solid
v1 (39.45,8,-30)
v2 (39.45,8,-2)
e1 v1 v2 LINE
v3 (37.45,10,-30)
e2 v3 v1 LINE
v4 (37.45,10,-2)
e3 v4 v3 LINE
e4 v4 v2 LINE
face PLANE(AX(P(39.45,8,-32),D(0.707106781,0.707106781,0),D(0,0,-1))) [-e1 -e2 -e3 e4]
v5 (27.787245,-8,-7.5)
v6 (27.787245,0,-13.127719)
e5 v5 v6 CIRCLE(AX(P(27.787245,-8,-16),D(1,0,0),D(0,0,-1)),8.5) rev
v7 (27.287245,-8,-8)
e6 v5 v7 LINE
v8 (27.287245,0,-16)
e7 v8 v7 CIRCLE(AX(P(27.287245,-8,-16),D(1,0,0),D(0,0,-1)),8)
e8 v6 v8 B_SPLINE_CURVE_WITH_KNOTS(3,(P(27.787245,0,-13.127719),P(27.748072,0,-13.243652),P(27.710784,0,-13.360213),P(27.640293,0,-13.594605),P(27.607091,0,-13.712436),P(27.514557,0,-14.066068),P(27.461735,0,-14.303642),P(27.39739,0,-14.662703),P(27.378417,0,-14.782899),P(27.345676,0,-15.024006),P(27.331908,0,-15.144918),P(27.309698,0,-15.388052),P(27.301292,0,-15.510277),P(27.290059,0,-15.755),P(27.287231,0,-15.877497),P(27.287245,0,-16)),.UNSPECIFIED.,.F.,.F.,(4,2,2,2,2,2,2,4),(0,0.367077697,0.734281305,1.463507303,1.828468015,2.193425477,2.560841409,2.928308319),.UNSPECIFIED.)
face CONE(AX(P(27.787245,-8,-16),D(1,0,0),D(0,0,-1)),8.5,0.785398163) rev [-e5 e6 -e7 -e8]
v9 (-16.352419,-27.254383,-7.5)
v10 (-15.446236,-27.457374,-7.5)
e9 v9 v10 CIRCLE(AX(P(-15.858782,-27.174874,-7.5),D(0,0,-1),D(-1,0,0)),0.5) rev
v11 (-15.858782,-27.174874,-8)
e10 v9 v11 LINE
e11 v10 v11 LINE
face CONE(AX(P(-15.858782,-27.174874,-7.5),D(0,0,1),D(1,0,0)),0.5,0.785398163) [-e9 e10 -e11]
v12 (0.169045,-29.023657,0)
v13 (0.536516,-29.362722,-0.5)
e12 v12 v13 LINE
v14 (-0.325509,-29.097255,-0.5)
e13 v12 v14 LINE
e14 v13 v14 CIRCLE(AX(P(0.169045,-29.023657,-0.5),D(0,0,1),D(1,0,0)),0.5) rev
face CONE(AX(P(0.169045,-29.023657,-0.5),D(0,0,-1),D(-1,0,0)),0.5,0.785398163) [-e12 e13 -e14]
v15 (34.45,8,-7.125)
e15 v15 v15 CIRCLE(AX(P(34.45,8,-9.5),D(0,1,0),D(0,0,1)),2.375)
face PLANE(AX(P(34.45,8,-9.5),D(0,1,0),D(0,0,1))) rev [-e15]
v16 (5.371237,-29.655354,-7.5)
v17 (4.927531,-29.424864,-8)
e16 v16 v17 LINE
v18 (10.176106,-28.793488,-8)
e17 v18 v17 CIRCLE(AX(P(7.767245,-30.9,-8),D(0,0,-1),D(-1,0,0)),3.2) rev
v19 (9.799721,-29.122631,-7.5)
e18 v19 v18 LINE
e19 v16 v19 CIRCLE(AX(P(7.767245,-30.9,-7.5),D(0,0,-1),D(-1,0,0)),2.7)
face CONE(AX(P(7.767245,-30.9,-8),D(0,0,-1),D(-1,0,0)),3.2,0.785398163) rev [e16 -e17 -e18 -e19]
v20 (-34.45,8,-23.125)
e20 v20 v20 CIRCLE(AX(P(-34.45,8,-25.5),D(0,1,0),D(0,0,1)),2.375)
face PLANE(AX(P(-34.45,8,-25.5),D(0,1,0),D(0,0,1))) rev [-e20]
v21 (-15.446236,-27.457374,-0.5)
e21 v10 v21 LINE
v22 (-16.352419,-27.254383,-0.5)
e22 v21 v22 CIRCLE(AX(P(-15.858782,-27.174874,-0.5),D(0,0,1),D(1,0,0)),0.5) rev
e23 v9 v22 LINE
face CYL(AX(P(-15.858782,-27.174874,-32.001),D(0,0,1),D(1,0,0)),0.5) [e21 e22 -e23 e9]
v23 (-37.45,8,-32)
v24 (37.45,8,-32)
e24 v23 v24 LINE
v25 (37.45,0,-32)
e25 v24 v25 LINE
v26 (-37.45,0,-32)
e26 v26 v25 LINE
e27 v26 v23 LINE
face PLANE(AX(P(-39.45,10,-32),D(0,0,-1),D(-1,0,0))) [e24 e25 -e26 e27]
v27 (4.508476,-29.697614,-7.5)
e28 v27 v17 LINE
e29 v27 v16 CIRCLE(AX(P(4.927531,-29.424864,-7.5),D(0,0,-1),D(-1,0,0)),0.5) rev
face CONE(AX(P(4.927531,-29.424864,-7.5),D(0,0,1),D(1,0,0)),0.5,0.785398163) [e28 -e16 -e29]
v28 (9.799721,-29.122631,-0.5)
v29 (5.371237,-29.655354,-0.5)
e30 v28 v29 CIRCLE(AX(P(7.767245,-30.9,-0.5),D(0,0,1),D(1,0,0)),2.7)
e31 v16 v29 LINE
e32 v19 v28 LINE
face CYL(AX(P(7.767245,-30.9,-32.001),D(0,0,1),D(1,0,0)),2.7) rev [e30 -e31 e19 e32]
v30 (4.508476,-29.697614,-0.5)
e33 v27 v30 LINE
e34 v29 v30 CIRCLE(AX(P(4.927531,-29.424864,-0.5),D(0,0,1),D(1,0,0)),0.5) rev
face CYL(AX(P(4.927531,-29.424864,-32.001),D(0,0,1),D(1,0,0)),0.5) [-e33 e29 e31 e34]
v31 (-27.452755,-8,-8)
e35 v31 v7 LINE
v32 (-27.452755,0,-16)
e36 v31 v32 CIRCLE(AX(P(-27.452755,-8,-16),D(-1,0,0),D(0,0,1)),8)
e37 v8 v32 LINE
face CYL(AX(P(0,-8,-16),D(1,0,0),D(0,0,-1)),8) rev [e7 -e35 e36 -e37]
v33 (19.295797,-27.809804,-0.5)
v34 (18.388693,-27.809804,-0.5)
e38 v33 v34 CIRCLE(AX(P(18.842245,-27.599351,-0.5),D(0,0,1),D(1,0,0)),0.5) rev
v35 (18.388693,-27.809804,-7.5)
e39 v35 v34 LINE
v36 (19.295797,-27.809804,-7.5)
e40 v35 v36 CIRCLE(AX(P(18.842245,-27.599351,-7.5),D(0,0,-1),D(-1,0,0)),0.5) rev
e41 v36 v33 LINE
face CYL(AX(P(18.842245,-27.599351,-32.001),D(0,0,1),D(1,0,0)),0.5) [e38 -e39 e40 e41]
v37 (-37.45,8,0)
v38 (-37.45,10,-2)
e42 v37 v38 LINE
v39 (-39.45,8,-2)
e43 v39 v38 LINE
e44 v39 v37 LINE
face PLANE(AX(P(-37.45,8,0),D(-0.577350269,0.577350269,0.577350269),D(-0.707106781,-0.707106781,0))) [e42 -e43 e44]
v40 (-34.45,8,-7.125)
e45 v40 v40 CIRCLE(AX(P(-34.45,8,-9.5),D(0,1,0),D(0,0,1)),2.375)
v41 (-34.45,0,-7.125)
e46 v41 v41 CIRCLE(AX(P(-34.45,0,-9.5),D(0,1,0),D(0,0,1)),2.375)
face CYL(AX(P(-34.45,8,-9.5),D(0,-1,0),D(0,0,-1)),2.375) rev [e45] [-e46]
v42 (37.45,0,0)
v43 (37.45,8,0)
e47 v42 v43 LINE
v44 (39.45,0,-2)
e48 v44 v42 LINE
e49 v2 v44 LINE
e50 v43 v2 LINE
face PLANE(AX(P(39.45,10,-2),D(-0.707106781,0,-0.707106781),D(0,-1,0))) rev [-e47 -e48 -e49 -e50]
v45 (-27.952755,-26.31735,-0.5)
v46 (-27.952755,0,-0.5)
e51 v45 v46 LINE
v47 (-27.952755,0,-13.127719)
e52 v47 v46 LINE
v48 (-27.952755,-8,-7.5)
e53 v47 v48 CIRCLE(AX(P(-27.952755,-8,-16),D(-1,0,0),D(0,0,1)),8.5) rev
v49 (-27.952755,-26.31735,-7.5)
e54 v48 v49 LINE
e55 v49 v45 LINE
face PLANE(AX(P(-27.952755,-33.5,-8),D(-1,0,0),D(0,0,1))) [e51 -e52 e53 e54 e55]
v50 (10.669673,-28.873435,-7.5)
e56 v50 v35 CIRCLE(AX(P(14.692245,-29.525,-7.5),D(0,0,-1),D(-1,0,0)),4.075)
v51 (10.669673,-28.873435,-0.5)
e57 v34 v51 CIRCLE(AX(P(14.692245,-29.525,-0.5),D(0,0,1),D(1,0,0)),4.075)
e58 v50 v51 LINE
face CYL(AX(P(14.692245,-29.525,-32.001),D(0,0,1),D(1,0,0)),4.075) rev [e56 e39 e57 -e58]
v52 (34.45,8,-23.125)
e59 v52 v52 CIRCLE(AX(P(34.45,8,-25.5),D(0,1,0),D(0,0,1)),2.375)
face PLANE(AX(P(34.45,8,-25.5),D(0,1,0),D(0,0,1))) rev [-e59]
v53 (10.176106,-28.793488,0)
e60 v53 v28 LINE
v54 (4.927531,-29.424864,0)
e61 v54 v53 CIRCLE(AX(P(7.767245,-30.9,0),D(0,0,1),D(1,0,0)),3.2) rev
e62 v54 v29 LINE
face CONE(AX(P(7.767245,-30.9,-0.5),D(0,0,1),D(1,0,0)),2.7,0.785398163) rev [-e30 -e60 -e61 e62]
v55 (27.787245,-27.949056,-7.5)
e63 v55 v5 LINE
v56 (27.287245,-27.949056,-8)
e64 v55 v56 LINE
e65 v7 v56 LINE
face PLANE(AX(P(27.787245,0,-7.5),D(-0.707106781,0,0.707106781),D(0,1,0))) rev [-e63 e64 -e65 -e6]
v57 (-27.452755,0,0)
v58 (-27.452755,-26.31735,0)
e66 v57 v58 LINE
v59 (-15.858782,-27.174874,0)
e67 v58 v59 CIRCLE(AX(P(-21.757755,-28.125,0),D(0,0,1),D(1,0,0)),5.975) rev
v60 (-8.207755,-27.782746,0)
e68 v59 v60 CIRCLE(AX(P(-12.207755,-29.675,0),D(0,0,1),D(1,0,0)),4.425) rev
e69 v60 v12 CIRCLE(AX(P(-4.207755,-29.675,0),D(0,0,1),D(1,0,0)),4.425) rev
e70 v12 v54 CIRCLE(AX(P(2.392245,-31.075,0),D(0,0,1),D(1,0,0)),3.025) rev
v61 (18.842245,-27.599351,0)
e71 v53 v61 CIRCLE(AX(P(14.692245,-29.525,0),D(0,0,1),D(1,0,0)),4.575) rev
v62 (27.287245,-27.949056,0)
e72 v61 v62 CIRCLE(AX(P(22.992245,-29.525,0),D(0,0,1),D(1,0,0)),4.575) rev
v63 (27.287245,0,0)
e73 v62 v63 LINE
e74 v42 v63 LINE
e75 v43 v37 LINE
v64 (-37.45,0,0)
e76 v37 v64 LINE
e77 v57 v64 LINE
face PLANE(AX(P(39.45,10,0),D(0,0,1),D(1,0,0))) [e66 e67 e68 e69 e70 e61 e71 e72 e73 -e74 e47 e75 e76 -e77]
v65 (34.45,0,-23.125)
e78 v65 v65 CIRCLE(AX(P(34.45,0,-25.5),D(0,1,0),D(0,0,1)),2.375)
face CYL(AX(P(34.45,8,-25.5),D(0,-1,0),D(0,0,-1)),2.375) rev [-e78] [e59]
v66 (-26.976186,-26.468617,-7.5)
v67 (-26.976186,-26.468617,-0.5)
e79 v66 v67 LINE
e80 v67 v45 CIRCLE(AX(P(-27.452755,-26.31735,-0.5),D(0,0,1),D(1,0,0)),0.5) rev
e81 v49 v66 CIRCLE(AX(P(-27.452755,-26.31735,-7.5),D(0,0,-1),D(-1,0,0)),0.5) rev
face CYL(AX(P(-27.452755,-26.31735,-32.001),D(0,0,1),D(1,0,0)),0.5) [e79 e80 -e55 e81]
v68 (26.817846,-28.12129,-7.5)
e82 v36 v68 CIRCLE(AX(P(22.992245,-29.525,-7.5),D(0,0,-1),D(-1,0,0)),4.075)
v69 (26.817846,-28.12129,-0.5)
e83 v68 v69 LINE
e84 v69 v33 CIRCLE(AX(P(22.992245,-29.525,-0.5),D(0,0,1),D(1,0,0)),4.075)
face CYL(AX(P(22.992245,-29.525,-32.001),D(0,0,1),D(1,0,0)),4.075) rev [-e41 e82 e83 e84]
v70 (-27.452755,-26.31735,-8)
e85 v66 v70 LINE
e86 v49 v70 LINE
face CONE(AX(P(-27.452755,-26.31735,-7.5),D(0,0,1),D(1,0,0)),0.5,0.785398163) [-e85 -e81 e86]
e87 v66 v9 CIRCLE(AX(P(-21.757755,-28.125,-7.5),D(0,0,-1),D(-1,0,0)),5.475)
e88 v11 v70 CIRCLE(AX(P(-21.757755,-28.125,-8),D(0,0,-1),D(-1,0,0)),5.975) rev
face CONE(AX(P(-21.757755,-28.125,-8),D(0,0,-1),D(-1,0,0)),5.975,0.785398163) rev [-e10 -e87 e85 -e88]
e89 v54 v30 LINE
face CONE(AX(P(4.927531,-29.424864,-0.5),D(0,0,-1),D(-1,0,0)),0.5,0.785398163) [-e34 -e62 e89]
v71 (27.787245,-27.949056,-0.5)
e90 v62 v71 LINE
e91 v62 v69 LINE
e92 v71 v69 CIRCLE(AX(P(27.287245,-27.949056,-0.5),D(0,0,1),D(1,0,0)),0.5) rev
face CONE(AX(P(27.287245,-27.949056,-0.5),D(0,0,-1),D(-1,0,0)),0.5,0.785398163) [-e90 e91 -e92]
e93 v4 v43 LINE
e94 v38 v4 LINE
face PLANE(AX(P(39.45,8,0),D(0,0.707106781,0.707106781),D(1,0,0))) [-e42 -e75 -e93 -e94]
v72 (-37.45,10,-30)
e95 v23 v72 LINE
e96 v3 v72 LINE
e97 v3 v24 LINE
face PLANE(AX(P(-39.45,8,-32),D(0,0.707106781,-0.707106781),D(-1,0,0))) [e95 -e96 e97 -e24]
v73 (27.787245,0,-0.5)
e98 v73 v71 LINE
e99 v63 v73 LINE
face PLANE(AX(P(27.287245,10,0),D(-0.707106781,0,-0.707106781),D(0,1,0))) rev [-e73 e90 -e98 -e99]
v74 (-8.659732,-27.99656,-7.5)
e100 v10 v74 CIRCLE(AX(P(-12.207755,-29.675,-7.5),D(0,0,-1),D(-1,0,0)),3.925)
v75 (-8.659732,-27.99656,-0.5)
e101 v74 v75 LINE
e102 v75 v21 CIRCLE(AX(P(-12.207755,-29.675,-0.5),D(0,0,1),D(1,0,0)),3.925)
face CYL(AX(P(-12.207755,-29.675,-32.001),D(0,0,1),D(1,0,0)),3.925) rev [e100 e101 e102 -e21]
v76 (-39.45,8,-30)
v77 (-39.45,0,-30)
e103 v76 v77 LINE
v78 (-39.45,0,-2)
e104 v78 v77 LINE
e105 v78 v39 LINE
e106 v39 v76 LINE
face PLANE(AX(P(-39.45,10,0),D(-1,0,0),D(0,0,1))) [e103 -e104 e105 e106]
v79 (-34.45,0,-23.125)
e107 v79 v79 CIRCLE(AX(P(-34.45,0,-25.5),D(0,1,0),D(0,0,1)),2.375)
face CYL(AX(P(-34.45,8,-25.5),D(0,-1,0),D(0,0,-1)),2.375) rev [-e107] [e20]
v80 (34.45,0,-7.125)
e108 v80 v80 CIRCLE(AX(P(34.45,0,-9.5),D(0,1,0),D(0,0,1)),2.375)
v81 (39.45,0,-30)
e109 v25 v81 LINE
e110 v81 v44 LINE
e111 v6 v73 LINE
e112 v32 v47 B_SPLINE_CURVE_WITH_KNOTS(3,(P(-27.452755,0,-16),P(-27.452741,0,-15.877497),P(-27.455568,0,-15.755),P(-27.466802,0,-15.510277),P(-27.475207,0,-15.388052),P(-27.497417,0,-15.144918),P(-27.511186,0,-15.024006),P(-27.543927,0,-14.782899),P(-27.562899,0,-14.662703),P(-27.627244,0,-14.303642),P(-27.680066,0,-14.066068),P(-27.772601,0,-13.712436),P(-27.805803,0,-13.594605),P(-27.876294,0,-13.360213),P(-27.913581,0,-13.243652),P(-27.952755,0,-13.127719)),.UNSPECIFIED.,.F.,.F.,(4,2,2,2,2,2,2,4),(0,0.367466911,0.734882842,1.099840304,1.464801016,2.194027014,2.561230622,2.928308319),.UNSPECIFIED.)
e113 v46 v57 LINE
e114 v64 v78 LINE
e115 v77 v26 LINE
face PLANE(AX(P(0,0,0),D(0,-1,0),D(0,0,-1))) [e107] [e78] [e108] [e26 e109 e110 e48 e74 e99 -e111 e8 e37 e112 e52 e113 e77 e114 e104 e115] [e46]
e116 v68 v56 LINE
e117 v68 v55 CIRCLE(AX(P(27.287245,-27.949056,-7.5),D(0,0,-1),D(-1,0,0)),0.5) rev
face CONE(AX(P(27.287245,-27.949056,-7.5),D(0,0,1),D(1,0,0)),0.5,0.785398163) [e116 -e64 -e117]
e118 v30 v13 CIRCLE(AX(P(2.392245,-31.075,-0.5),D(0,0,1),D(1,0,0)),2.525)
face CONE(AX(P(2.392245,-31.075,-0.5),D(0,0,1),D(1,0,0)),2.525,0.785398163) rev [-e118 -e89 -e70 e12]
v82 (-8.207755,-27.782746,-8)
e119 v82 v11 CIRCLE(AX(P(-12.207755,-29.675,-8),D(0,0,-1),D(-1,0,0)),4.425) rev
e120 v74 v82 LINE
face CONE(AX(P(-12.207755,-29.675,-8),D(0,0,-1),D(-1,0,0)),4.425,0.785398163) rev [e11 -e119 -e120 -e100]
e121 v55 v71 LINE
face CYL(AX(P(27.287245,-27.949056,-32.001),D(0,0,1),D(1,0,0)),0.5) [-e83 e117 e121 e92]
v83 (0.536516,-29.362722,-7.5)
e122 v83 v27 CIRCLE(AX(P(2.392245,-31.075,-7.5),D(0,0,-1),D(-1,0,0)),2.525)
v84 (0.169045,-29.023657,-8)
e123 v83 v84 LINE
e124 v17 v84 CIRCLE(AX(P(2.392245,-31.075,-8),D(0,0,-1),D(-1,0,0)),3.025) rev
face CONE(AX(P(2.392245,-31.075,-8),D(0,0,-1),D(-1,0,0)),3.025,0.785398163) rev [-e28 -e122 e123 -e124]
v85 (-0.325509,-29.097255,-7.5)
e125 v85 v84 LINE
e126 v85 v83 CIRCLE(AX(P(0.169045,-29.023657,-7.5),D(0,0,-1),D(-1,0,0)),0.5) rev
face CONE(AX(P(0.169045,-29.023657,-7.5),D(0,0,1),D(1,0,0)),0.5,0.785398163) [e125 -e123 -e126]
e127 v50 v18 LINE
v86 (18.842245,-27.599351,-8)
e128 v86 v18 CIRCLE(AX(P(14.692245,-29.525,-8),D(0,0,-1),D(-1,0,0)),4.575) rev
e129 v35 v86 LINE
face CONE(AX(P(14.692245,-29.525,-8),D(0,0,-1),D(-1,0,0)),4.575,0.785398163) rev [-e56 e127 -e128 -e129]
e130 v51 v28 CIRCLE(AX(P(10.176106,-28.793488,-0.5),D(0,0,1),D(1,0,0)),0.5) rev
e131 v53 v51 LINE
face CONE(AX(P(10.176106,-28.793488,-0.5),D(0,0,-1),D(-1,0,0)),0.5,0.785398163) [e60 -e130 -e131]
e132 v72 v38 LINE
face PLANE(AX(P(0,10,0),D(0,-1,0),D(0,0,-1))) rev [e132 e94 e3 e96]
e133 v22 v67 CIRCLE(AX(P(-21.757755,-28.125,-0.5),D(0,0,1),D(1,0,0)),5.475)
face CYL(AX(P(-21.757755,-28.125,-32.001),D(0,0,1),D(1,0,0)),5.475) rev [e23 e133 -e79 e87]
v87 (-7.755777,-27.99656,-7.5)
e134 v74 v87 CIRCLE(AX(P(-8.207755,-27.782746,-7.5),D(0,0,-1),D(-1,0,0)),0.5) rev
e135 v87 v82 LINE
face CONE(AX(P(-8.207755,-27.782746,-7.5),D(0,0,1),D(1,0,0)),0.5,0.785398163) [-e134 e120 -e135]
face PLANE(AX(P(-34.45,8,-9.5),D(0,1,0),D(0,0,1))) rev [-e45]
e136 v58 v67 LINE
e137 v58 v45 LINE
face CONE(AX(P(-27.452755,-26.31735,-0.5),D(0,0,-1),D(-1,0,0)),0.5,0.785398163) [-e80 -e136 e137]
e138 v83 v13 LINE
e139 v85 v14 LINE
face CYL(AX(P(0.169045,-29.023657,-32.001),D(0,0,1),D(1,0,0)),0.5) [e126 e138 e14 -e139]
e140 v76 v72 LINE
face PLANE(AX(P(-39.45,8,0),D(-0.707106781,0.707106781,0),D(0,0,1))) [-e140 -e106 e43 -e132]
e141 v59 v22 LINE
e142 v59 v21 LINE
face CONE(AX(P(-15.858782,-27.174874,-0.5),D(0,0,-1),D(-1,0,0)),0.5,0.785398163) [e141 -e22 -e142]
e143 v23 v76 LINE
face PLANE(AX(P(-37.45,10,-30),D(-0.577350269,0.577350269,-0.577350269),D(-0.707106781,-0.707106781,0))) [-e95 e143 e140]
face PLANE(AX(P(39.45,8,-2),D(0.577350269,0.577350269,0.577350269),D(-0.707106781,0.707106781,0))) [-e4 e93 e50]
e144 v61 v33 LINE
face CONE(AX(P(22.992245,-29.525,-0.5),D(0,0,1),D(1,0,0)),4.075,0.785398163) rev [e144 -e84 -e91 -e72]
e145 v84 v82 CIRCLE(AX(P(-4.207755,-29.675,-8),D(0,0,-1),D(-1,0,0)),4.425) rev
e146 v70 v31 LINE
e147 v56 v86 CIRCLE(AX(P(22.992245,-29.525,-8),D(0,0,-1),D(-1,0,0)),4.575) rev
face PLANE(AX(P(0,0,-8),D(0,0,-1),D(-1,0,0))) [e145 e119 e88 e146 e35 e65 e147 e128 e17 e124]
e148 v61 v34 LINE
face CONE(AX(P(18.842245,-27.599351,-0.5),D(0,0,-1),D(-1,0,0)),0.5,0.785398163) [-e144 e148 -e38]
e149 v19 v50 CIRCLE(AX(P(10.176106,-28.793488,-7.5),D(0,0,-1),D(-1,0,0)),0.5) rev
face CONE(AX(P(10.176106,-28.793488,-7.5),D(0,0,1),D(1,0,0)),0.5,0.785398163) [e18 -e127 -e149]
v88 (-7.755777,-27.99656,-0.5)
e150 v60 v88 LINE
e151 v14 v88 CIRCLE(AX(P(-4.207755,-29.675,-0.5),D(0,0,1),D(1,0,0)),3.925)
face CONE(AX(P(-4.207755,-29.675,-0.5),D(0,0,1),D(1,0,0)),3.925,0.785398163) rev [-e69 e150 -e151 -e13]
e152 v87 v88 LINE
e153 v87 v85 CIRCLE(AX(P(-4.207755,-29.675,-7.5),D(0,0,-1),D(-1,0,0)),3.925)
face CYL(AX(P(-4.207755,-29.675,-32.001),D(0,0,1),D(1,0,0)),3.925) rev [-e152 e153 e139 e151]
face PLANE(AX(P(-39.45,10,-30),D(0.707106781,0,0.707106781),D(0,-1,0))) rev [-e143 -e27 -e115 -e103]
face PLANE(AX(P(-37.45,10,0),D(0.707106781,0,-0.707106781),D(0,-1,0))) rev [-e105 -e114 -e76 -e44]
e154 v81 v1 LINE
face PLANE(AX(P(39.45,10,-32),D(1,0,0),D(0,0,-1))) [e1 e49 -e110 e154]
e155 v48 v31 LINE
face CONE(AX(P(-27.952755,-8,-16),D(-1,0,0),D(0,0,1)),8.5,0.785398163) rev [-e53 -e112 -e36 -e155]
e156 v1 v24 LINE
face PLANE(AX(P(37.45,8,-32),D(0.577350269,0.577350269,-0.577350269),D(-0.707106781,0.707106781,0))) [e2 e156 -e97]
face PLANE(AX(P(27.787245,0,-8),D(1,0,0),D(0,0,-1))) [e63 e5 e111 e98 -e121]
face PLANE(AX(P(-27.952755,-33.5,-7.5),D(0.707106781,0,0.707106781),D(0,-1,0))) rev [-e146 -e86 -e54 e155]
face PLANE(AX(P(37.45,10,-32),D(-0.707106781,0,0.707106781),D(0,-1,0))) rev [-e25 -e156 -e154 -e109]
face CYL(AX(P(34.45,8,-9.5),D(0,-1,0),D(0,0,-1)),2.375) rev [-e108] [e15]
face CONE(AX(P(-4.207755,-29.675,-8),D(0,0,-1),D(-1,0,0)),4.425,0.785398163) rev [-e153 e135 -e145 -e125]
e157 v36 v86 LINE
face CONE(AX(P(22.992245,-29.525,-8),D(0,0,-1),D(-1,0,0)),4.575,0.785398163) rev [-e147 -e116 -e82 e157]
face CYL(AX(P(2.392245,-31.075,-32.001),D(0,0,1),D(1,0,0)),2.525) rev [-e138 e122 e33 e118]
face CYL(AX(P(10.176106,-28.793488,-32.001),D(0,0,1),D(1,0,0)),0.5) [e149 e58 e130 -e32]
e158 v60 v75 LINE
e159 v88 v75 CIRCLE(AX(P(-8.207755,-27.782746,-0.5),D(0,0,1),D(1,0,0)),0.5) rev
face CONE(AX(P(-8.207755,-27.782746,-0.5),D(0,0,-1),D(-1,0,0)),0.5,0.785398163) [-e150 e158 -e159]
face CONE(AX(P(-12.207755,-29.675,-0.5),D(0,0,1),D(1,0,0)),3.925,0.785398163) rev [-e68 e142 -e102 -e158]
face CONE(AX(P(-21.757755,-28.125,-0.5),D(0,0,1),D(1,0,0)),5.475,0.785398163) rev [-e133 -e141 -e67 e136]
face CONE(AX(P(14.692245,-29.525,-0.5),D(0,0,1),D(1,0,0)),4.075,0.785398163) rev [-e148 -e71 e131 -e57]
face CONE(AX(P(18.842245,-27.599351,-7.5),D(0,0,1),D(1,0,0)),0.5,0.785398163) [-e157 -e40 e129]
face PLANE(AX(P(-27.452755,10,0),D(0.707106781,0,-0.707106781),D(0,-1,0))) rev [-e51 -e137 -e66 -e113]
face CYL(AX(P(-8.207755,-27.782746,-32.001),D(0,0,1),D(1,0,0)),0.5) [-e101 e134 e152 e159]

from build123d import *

# Parameters (mm, degrees)
SKETCH3_W           = 78.9
SKETCH3_H           = 32
BOSS_EXTRUDE1_DEPTH = 10
SKETCH3_4_R         = 2.375
CUT_EXTRUDE1_DEPTH  = 8
SKETCH4_W           = 55.74
SKETCH4_H           = 33.5
BOSS_EXTRUDE2_DEPTH = 8
CUT_EXTRUDE2_REACH  = 62.849
FILLET1_R           = 8
CHAMFER1_SIZE       = 2
CHAMFER2_SIZE       = 0.5


with BuildPart() as part:
    # Sketch3 → Boss-Extrude1 (new body)
    with BuildSketch(Plane(origin=(0, 0, 0), x_dir=(1, 0, 0), z_dir=(0, 1, 0))):
        with Locations((0, 16)):
            Rectangle(SKETCH3_W, SKETCH3_H)
    extrude(amount=BOSS_EXTRUDE1_DEPTH)

    # Sketch3<4> → Cut-Extrude1 (cut)
    with BuildSketch(Plane(origin=(0, 0, 0), x_dir=(1, 0, 0), z_dir=(0, 1, 0))):
        with Locations(Location((-34.45, 9.5, 0), (0, 0, 270))):
            Circle(SKETCH3_4_R)
        with Locations(Location((34.45, 9.5, 0), (0, 0, 270))):
            Circle(SKETCH3_4_R)
        with Locations(Location((-34.45, 25.5, 0), (0, 0, 270))):
            Circle(SKETCH3_4_R)
        with Locations(Location((34.45, 25.5, 0), (0, 0, 270))):
            Circle(SKETCH3_4_R)
    extrude(amount=CUT_EXTRUDE1_DEPTH, mode=Mode.SUBTRACT)

    # Sketch4 → Boss-Extrude2 (add)
    with BuildSketch(Plane.XY):
        with Locations((-0.082754798, -16.75)):
            Rectangle(SKETCH4_W, SKETCH4_H)
    extrude(amount=-BOSS_EXTRUDE2_DEPTH)

    # Sketch6 → Cut-Extrude2 (cut, up to next)
    with BuildSketch(Plane.XY, mode=Mode.PRIVATE) as cut_extrude2_sk1:
        with BuildLine():
            Line((-27.952754798, -33.5), (27.787245202, -33.5))
            Line((27.787245202, -33.5), (27.787245202, -27.949055839))
            ThreePointArc((27.787245202, -27.949055839), (27.374711042, -28.441346126), (26.817846295, -28.121290173))
            ThreePointArc((26.817846295, -28.121290173), (23.160845315, -25.453489346), (19.295797115, -27.809804228))
            ThreePointArc((19.295797115, -27.809804228), (18.842245202, -28.099350759), (18.388693289, -27.809804228))
            ThreePointArc((18.388693289, -27.809804228), (14.135992665, -25.488143783), (10.669672877, -28.873435048))
            ThreePointArc((10.669672877, -28.873435048), (10.313792265, -29.274157145), (9.799721264, -29.122630861))
            ThreePointArc((9.799721264, -29.122630861), (7.44477434, -28.219326103), (5.371236745, -29.655354078))
            ThreePointArc((5.371236745, -29.655354078), (4.951993147, -29.92426536), (4.508475892, -29.697613829))
            ThreePointArc((4.508475892, -29.697613829), (2.60438519, -28.558927341), (0.536516234, -29.362722278))
            ThreePointArc((0.536516234, -29.362722278), (0.021886532, -29.501511273), (-0.325508515, -29.097255418))
            ThreePointArc((-0.325508515, -29.097255418), (-3.632594875, -25.792369955), (-7.755777397, -27.996560058))
            ThreePointArc((-7.755777397, -27.996560058), (-8.207754798, -28.282746053), (-8.659732199, -27.996560058))
            ThreePointArc((-8.659732199, -27.996560058), (-11.896894258, -25.762329464), (-15.446236111, -27.45737429))
            ThreePointArc((-15.446236111, -27.45737429), (-15.968076529, -27.66278259), (-16.352419433, -27.254382635))
            ThreePointArc((-16.352419433, -27.254382635), (-21.353910692, -22.664914384), (-26.97618576, -26.468617408))
            ThreePointArc((-26.97618576, -26.468617408), (-27.529290676, -26.81145713), (-27.952754798, -26.317349591))
            Line((-27.952754798, -26.317349591), (-27.952754798, -33.5))
        make_face()
    cut_extrude2_tool1 = extrude(cut_extrude2_sk1.sketch, amount=-CUT_EXTRUDE2_REACH, mode=Mode.PRIVATE) & part.part
    add(cut_extrude2_tool1.solids().sort_by_distance((-1.952714, -29.732571, 0))[0], mode=Mode.SUBTRACT)

    # Fillet1
    fillet1_edges = [part.edges().sort_by_distance(p)[0] for p in [
        (-0.082754798, 0, -8),
    ]]
    fillet(fillet1_edges, radius=FILLET1_R)

    # Chamfer1
    chamfer1_edges = [part.edges().sort_by_distance(p)[0] for p in [
        (39.45, 10, -16),
        (0, 10, 0),
        (-39.45, 10, -16),
        (0, 10, -32),
        (-39.45, 5, 0),
        (39.45, 5, 0),
        (39.45, 5, -32),
        (-39.45, 5, -32),
    ]]
    chamfer(chamfer1_edges, length=CHAMFER1_SIZE)

    # Chamfer2
    # the kernel refuses this chamfer: 0.5 mm, written as the material it takes off along each edge
    with BuildSketch(Plane(origin=(-27.952754798, -26.317349591, 0), x_dir=(1, 0, 0), z_dir=(0, 1, 0))) as chamfer2_piece_1:
        Polygon((CHAMFER2_SIZE, 0), (0, CHAMFER2_SIZE), (0, 0), align=None)
    extrude(amount=26.317349591, mode=Mode.SUBTRACT)
    with BuildSketch(Plane(origin=(27.787245202, -8, -8), x_dir=(0, 0, 1), z_dir=(0, -1, 0))) as chamfer2_piece_2:
        Polygon((CHAMFER2_SIZE, 0), (0, CHAMFER2_SIZE), (0, 0), align=None)
    extrude(amount=19.949055839, mode=Mode.SUBTRACT)
    with BuildSketch(Plane(origin=(27.787245202, 0, 0), x_dir=(-1, 0, 0), z_dir=(0, -1, 0))) as chamfer2_piece_3:
        Polygon((CHAMFER2_SIZE, 0), (0, CHAMFER2_SIZE), (0, 0), align=None)
    extrude(amount=27.949055839, mode=Mode.SUBTRACT)
    with BuildSketch(Plane(origin=(-15.858781501, -27.1748742, -8), x_dir=(-0.987275865677397, -0.15901687033439718, 0), z_dir=(-0.15901687033439718, 0.987275865677397, 0))) as chamfer2_piece_4:
        Polygon((0.5, CHAMFER2_SIZE), (0.5 - CHAMFER2_SIZE, 0), (0.5, 0), align=None)
    revolve(axis=Axis((-15.858781501, -27.1748742, -8), (0, 0, 1)), revolution_arc=136.447859655, mode=Mode.SUBTRACT)
    with BuildSketch(Plane(origin=(-12.207754798, -29.675, -8), x_dir=(0.9039548022598873, 0.4276280106252253, 0), z_dir=(0.4276280106252253, -0.9039548022598873, 0))) as chamfer2_piece_5:
        Polygon((3.925, CHAMFER2_SIZE), (3.925 + CHAMFER2_SIZE, 0), (3.925, 0), align=None)
    revolve(axis=Axis((-12.207754798, -29.675, -8), (0, 0, 1)), revolution_arc=120.280574477, mode=Mode.SUBTRACT)
    with BuildSketch(Plane(origin=(-8.207754798, -27.782746053, -8), x_dir=(-0.9039548022598843, -0.427628010625232, 0), z_dir=(-0.427628010625232, 0.9039548022598843, 0))) as chamfer2_piece_6:
        Polygon((0.5, CHAMFER2_SIZE), (0.5 - CHAMFER2_SIZE, 0), (0.5, 0), align=None)
    revolve(axis=Axis((-8.207754798, -27.782746053, -8), (0, 0, 1)), revolution_arc=129.365756689, mode=Mode.SUBTRACT)
    with BuildSketch(Plane(origin=(-4.207754798, -29.675, -8), x_dir=(0.9891073331389847, 0.1471960717230098, 0), z_dir=(0.1471960717230098, -0.9891073331389847, 0))) as chamfer2_piece_7:
        Polygon((3.925, CHAMFER2_SIZE), (3.925 + CHAMFER2_SIZE, 0), (3.925, 0), align=None)
    revolve(axis=Axis((-4.207754798, -29.675, -8), (0, 0, 1)), revolution_arc=146.218408748, mode=Mode.SUBTRACT)
    with BuildSketch(Plane(origin=(0.169045151, -29.023657383, -8), x_dir=(-0.989107333138985, -0.14719607172300886, 0), z_dir=(-0.14719607172300886, 0.989107333138985, 0))) as chamfer2_piece_8:
        Polygon((0.5, CHAMFER2_SIZE), (0.5 - CHAMFER2_SIZE, 0), (0.5, 0), align=None)
    revolve(axis=Axis((0.169045151, -29.023657383, -8), (0, 0, 1)), revolution_arc=128.837859802, mode=Mode.SUBTRACT)
    with BuildSketch(Plane(origin=(2.392245202, -31.075, -8), x_dir=(0.8381111645487582, 0.5454994737474312, 0), z_dir=(0.5454994737474312, -0.8381111645487582, 0))) as chamfer2_piece_9:
        Polygon((2.525, CHAMFER2_SIZE), (2.525 + CHAMFER2_SIZE, 0), (2.525, 0), align=None)
    revolve(axis=Axis((2.392245202, -31.075, -8), (0, 0, 1)), revolution_arc=104.243526868, mode=Mode.SUBTRACT)
    with BuildSketch(Plane(origin=(4.927531475, -29.424864092, -8), x_dir=(-0.8381111645487566, -0.5454994737474338, 0), z_dir=(-0.5454994737474338, 0.8381111645487566, 0))) as chamfer2_piece_10:
        Polygon((0.5, CHAMFER2_SIZE), (0.5 - CHAMFER2_SIZE, 0), (0.5, 0), align=None)
    revolve(axis=Axis((4.927531475, -29.424864092, -8), (0, 0, 1)), revolution_arc=119.490836117, mode=Mode.SUBTRACT)
    with BuildSketch(Plane(origin=(7.767245202, -30.9, -8), x_dir=(0.7527689119185456, 0.6582848663374914, 0), z_dir=(0.6582848663374914, -0.7527689119185456, 0))) as chamfer2_piece_11:
        Polygon((2.7, CHAMFER2_SIZE), (2.7 + CHAMFER2_SIZE, 0), (2.7, 0), align=None)
    revolve(axis=Axis((7.767245202, -30.9, -8), (0, 0, 1)), revolution_arc=111.380440885, mode=Mode.SUBTRACT)
    with BuildSketch(Plane(origin=(10.17610572, -28.793488428, -8), x_dir=(-0.7527689119185441, -0.6582848663374932, 0), z_dir=(-0.6582848663374932, 0.7527689119185441, 0))) as chamfer2_piece_12:
        Polygon((0.5, CHAMFER2_SIZE), (0.5 - CHAMFER2_SIZE, 0), (0.5, 0), align=None)
    revolve(axis=Axis((10.17610572, -28.793488428, -8), (0, 0, 1)), revolution_arc=129.630102702, mode=Mode.SUBTRACT)
    with BuildSketch(Plane(origin=(14.692245202, -29.525, -8), x_dir=(0.9071038251366096, 0.42090693795960527, 0), z_dir=(0.42090693795960527, -0.9071038251366096, 0))) as chamfer2_piece_13:
        Polygon((4.075, CHAMFER2_SIZE), (4.075 + CHAMFER2_SIZE, 0), (4.075, 0), align=None)
    revolve(axis=Axis((14.692245202, -29.525, -8), (0, 0, 1)), revolution_arc=145.907440943, mode=Mode.SUBTRACT)
    with BuildSketch(Plane(origin=(18.842245202, -27.599350759, -8), x_dir=(-0.9071038251366129, -0.4209069379595987, 0), z_dir=(-0.4209069379595987, 0.9071038251366129, 0))) as chamfer2_piece_14:
        Polygon((0.5, CHAMFER2_SIZE), (0.5 - CHAMFER2_SIZE, 0), (0.5, 0), align=None)
    revolve(axis=Axis((18.842245202, -27.599350759, -8), (0, 0, 1)), revolution_arc=130.21628096, mode=Mode.SUBTRACT)
    with BuildSketch(Plane(origin=(22.992245202, -29.525, -8), x_dir=(0.9387978142076504, 0.3444686691688196, 0), z_dir=(0.3444686691688196, -0.9387978142076504, 0))) as chamfer2_piece_15:
        Polygon((4.075, CHAMFER2_SIZE), (4.075 + CHAMFER2_SIZE, 0), (4.075, 0), align=None)
    revolve(axis=Axis((22.992245202, -29.525, -8), (0, 0, 1)), revolution_arc=134.95877574, mode=Mode.SUBTRACT)
    with BuildSketch(Plane(origin=(27.287245202, -27.949055839, -8), x_dir=(-0.9387978142076511, -0.3444686691688182, 0), z_dir=(-0.3444686691688182, 0.9387978142076511, 0))) as chamfer2_piece_16:
        Polygon((0.5, CHAMFER2_SIZE), (0.5 - CHAMFER2_SIZE, 0), (0.5, 0), align=None)
    revolve(axis=Axis((27.287245202, -27.949055839, -8), (0, 0, 1)), revolution_arc=159.85063526, mode=Mode.SUBTRACT)
    with BuildSketch(Plane(origin=(-27.452754798, -26.317349591, -8), x_dir=(-1, 0, 0), z_dir=(0, 1, 0))) as chamfer2_piece_17:
        Polygon((0.5, CHAMFER2_SIZE), (0.5 - CHAMFER2_SIZE, 0), (0.5, 0), align=None)
    revolve(axis=Axis((-27.452754798, -26.317349591, -8), (0, 0, 1)), revolution_arc=162.390037032, mode=Mode.SUBTRACT)
    with BuildSketch(Plane(origin=(-21.757754798, -28.125, -8), x_dir=(0.9872758656773971, 0.1590168703343955, 0), z_dir=(0.1590168703343955, -0.9872758656773971, 0))) as chamfer2_piece_18:
        Polygon((5.475, CHAMFER2_SIZE), (5.475 + CHAMFER2_SIZE, 0), (5.475, 0), align=None)
    revolve(axis=Axis((-21.757754798, -28.125, -8), (0, 0, 1)), revolution_arc=153.240200555, mode=Mode.SUBTRACT)
    with BuildSketch(Plane(origin=(-15.858781501, -27.1748742, 0), x_dir=(0.8250907802435141, -0.5650001808470059, 0), z_dir=(0.5650001808470059, 0.8250907802435141, 0))) as chamfer2_piece_19:
        Polygon((0.5 - CHAMFER2_SIZE, 0), (0.5, CHAMFER2_SIZE), (0.5, 0), align=None)
    revolve(axis=Axis((-15.858781501, -27.1748742, 0), (0, 0, -1)), revolution_arc=136.447859655, mode=Mode.SUBTRACT)
    with BuildSketch(Plane(origin=(-21.757754798, -28.125, 0), x_dir=(0.9872758656773971, 0.1590168703343955, 0), z_dir=(0.1590168703343955, -0.9872758656773971, 0))) as chamfer2_piece_20:
        Polygon((5.475 + CHAMFER2_SIZE, 0), (5.475, -CHAMFER2_SIZE), (5.475, 0), align=None)
    revolve(axis=Axis((-21.757754798, -28.125, 0), (0, 0, 1)), revolution_arc=153.240200555, mode=Mode.SUBTRACT)
    with BuildSketch(Plane(origin=(-27.452754798, -26.317349591, 0), x_dir=(0.9531380753138083, -0.3025356332518353, 0), z_dir=(0.3025356332518353, 0.9531380753138083, 0))) as chamfer2_piece_21:
        Polygon((0.5 - CHAMFER2_SIZE, 0), (0.5, CHAMFER2_SIZE), (0.5, 0), align=None)
    revolve(axis=Axis((-27.452754798, -26.317349591, 0), (0, 0, -1)), revolution_arc=162.390037032, mode=Mode.SUBTRACT)
    with BuildSketch(Plane(origin=(27.287245202, -27.949055839, 0), x_dir=(1, 0, 0), z_dir=(0, 1, 0))) as chamfer2_piece_22:
        Polygon((0.5 - CHAMFER2_SIZE, 0), (0.5, CHAMFER2_SIZE), (0.5, 0), align=None)
    revolve(axis=Axis((27.287245202, -27.949055839, 0), (0, 0, -1)), revolution_arc=159.85063526, mode=Mode.SUBTRACT)
    with BuildSketch(Plane(origin=(22.992245202, -29.525, 0), x_dir=(0.9387978142076504, 0.3444686691688196, 0), z_dir=(0.3444686691688196, -0.9387978142076504, 0))) as chamfer2_piece_23:
        Polygon((4.075 + CHAMFER2_SIZE, 0), (4.075, -CHAMFER2_SIZE), (4.075, 0), align=None)
    revolve(axis=Axis((22.992245202, -29.525, 0), (0, 0, 1)), revolution_arc=134.95877574, mode=Mode.SUBTRACT)
    with BuildSketch(Plane(origin=(18.842245202, -27.599350759, 0), x_dir=(0.9071038251366116, -0.4209069379596014, 0), z_dir=(0.4209069379596014, 0.9071038251366116, 0))) as chamfer2_piece_24:
        Polygon((0.5 - CHAMFER2_SIZE, 0), (0.5, CHAMFER2_SIZE), (0.5, 0), align=None)
    revolve(axis=Axis((18.842245202, -27.599350759, 0), (0, 0, -1)), revolution_arc=130.21628096, mode=Mode.SUBTRACT)
    with BuildSketch(Plane(origin=(14.692245202, -29.525, 0), x_dir=(0.9071038251366096, 0.42090693795960527, 0), z_dir=(0.42090693795960527, -0.9071038251366096, 0))) as chamfer2_piece_25:
        Polygon((4.075 + CHAMFER2_SIZE, 0), (4.075, -CHAMFER2_SIZE), (4.075, 0), align=None)
    revolve(axis=Axis((14.692245202, -29.525, 0), (0, 0, 1)), revolution_arc=145.907440943, mode=Mode.SUBTRACT)
    with BuildSketch(Plane(origin=(10.17610572, -28.793488428, 0), x_dir=(0.9871343129750032, -0.15989323984261683, 0), z_dir=(0.15989323984261683, 0.9871343129750032, 0))) as chamfer2_piece_26:
        Polygon((0.5 - CHAMFER2_SIZE, 0), (0.5, CHAMFER2_SIZE), (0.5, 0), align=None)
    revolve(axis=Axis((10.17610572, -28.793488428, 0), (0, 0, -1)), revolution_arc=129.630102702, mode=Mode.SUBTRACT)
    with BuildSketch(Plane(origin=(7.767245202, -30.9, 0), x_dir=(0.7527689119185456, 0.6582848663374914, 0), z_dir=(0.6582848663374914, -0.7527689119185456, 0))) as chamfer2_piece_27:
        Polygon((2.7 + CHAMFER2_SIZE, 0), (2.7, -CHAMFER2_SIZE), (2.7, 0), align=None)
    revolve(axis=Axis((7.767245202, -30.9, 0), (0, 0, 1)), revolution_arc=111.380440885, mode=Mode.SUBTRACT)
    with BuildSketch(Plane(origin=(4.927531475, -29.424864092, 0), x_dir=(0.8874105397625023, -0.4609799712768705, 0), z_dir=(0.4609799712768705, 0.8874105397625023, 0))) as chamfer2_piece_28:
        Polygon((0.5 - CHAMFER2_SIZE, 0), (0.5, CHAMFER2_SIZE), (0.5, 0), align=None)
    revolve(axis=Axis((4.927531475, -29.424864092, 0), (0, 0, -1)), revolution_arc=119.490836117, mode=Mode.SUBTRACT)
    with BuildSketch(Plane(origin=(2.392245202, -31.075, 0), x_dir=(0.8381111645487582, 0.5454994737474312, 0), z_dir=(0.5454994737474312, -0.8381111645487582, 0))) as chamfer2_piece_29:
        Polygon((2.525 + CHAMFER2_SIZE, 0), (2.525, -CHAMFER2_SIZE), (2.525, 0), align=None)
    revolve(axis=Axis((2.392245202, -31.075, 0), (0, 0, 1)), revolution_arc=104.243526868, mode=Mode.SUBTRACT)
    with BuildSketch(Plane(origin=(0.169045151, -29.023657383, 0), x_dir=(0.734942165573552, -0.6781297908675433, 0), z_dir=(0.6781297908675433, 0.734942165573552, 0))) as chamfer2_piece_30:
        Polygon((0.5 - CHAMFER2_SIZE, 0), (0.5, CHAMFER2_SIZE), (0.5, 0), align=None)
    revolve(axis=Axis((0.169045151, -29.023657383, 0), (0, 0, -1)), revolution_arc=128.837859802, mode=Mode.SUBTRACT)
    with BuildSketch(Plane(origin=(-4.207754798, -29.675, 0), x_dir=(0.9891073331389847, 0.1471960717230098, 0), z_dir=(0.1471960717230098, -0.9891073331389847, 0))) as chamfer2_piece_31:
        Polygon((3.925 + CHAMFER2_SIZE, 0), (3.925, -CHAMFER2_SIZE), (3.925, 0), align=None)
    revolve(axis=Axis((-4.207754798, -29.675, 0), (0, 0, 1)), revolution_arc=146.218408748, mode=Mode.SUBTRACT)
    with BuildSketch(Plane(origin=(-8.207754798, -27.782746053, 0), x_dir=(0.9039548022598843, -0.427628010625232, 0), z_dir=(0.427628010625232, 0.9039548022598843, 0))) as chamfer2_piece_32:
        Polygon((0.5 - CHAMFER2_SIZE, 0), (0.5, CHAMFER2_SIZE), (0.5, 0), align=None)
    revolve(axis=Axis((-8.207754798, -27.782746053, 0), (0, 0, -1)), revolution_arc=129.365756689, mode=Mode.SUBTRACT)
    with BuildSketch(Plane(origin=(-12.207754798, -29.675, 0), x_dir=(0.9039548022598873, 0.4276280106252253, 0), z_dir=(0.4276280106252253, -0.9039548022598873, 0))) as chamfer2_piece_33:
        Polygon((3.925 + CHAMFER2_SIZE, 0), (3.925, -CHAMFER2_SIZE), (3.925, 0), align=None)
    revolve(axis=Axis((-12.207754798, -29.675, 0), (0, 0, 1)), revolution_arc=120.280574477, mode=Mode.SUBTRACT)
    with BuildSketch(Plane(origin=(-27.952754798, -26.317349591, -8), x_dir=(0, 0, 1), z_dir=(0, 1, 0))) as chamfer2_piece_34:
        Polygon((CHAMFER2_SIZE, 0), (0, CHAMFER2_SIZE), (0, 0), align=None)
    extrude(amount=18.317349591, mode=Mode.SUBTRACT)
    with BuildSketch(Plane(origin=(-27.952754798, -8, -16), x_dir=(0, 0.8858914010009324, -0.4638926876257108), z_dir=(0, -0.4638926876257108, -0.8858914010009324))) as chamfer2_piece_35_section:
        Polygon((8 + CHAMFER2_SIZE, 0), (8, CHAMFER2_SIZE), (8, 0), align=None)
    chamfer2_piece_35 = revolve(axis=Axis((-27.952754798, -8, -16), (1, 0, 0)), revolution_arc=117.638582209, mode=Mode.PRIVATE)
    chamfer2_piece_35 = split(chamfer2_piece_35, bisect_by=Plane(origin=(-27.952754798, 0, -16), z_dir=(0, -1, 0)), keep=Keep.TOP, mode=Mode.PRIVATE)
    add(chamfer2_piece_35, mode=Mode.SUBTRACT)
    with BuildSketch(Plane(origin=(27.787245202, -8, -16), x_dir=(0, 0.8858914010009324, -0.4638926876257108), z_dir=(0, -0.4638926876257108, -0.8858914010009324))) as chamfer2_piece_36_section:
        Polygon((8, -CHAMFER2_SIZE), (8 + CHAMFER2_SIZE, 0), (8, 0), align=None)
    chamfer2_piece_36 = revolve(axis=Axis((27.787245202, -8, -16), (1, 0, 0)), revolution_arc=117.638582209, mode=Mode.PRIVATE)
    chamfer2_piece_36 = split(chamfer2_piece_36, bisect_by=Plane(origin=(27.787245202, 0, -16), z_dir=(0, -1, 0)), keep=Keep.TOP, mode=Mode.PRIVATE)
    add(chamfer2_piece_36, mode=Mode.SUBTRACT)


solid = part.part
